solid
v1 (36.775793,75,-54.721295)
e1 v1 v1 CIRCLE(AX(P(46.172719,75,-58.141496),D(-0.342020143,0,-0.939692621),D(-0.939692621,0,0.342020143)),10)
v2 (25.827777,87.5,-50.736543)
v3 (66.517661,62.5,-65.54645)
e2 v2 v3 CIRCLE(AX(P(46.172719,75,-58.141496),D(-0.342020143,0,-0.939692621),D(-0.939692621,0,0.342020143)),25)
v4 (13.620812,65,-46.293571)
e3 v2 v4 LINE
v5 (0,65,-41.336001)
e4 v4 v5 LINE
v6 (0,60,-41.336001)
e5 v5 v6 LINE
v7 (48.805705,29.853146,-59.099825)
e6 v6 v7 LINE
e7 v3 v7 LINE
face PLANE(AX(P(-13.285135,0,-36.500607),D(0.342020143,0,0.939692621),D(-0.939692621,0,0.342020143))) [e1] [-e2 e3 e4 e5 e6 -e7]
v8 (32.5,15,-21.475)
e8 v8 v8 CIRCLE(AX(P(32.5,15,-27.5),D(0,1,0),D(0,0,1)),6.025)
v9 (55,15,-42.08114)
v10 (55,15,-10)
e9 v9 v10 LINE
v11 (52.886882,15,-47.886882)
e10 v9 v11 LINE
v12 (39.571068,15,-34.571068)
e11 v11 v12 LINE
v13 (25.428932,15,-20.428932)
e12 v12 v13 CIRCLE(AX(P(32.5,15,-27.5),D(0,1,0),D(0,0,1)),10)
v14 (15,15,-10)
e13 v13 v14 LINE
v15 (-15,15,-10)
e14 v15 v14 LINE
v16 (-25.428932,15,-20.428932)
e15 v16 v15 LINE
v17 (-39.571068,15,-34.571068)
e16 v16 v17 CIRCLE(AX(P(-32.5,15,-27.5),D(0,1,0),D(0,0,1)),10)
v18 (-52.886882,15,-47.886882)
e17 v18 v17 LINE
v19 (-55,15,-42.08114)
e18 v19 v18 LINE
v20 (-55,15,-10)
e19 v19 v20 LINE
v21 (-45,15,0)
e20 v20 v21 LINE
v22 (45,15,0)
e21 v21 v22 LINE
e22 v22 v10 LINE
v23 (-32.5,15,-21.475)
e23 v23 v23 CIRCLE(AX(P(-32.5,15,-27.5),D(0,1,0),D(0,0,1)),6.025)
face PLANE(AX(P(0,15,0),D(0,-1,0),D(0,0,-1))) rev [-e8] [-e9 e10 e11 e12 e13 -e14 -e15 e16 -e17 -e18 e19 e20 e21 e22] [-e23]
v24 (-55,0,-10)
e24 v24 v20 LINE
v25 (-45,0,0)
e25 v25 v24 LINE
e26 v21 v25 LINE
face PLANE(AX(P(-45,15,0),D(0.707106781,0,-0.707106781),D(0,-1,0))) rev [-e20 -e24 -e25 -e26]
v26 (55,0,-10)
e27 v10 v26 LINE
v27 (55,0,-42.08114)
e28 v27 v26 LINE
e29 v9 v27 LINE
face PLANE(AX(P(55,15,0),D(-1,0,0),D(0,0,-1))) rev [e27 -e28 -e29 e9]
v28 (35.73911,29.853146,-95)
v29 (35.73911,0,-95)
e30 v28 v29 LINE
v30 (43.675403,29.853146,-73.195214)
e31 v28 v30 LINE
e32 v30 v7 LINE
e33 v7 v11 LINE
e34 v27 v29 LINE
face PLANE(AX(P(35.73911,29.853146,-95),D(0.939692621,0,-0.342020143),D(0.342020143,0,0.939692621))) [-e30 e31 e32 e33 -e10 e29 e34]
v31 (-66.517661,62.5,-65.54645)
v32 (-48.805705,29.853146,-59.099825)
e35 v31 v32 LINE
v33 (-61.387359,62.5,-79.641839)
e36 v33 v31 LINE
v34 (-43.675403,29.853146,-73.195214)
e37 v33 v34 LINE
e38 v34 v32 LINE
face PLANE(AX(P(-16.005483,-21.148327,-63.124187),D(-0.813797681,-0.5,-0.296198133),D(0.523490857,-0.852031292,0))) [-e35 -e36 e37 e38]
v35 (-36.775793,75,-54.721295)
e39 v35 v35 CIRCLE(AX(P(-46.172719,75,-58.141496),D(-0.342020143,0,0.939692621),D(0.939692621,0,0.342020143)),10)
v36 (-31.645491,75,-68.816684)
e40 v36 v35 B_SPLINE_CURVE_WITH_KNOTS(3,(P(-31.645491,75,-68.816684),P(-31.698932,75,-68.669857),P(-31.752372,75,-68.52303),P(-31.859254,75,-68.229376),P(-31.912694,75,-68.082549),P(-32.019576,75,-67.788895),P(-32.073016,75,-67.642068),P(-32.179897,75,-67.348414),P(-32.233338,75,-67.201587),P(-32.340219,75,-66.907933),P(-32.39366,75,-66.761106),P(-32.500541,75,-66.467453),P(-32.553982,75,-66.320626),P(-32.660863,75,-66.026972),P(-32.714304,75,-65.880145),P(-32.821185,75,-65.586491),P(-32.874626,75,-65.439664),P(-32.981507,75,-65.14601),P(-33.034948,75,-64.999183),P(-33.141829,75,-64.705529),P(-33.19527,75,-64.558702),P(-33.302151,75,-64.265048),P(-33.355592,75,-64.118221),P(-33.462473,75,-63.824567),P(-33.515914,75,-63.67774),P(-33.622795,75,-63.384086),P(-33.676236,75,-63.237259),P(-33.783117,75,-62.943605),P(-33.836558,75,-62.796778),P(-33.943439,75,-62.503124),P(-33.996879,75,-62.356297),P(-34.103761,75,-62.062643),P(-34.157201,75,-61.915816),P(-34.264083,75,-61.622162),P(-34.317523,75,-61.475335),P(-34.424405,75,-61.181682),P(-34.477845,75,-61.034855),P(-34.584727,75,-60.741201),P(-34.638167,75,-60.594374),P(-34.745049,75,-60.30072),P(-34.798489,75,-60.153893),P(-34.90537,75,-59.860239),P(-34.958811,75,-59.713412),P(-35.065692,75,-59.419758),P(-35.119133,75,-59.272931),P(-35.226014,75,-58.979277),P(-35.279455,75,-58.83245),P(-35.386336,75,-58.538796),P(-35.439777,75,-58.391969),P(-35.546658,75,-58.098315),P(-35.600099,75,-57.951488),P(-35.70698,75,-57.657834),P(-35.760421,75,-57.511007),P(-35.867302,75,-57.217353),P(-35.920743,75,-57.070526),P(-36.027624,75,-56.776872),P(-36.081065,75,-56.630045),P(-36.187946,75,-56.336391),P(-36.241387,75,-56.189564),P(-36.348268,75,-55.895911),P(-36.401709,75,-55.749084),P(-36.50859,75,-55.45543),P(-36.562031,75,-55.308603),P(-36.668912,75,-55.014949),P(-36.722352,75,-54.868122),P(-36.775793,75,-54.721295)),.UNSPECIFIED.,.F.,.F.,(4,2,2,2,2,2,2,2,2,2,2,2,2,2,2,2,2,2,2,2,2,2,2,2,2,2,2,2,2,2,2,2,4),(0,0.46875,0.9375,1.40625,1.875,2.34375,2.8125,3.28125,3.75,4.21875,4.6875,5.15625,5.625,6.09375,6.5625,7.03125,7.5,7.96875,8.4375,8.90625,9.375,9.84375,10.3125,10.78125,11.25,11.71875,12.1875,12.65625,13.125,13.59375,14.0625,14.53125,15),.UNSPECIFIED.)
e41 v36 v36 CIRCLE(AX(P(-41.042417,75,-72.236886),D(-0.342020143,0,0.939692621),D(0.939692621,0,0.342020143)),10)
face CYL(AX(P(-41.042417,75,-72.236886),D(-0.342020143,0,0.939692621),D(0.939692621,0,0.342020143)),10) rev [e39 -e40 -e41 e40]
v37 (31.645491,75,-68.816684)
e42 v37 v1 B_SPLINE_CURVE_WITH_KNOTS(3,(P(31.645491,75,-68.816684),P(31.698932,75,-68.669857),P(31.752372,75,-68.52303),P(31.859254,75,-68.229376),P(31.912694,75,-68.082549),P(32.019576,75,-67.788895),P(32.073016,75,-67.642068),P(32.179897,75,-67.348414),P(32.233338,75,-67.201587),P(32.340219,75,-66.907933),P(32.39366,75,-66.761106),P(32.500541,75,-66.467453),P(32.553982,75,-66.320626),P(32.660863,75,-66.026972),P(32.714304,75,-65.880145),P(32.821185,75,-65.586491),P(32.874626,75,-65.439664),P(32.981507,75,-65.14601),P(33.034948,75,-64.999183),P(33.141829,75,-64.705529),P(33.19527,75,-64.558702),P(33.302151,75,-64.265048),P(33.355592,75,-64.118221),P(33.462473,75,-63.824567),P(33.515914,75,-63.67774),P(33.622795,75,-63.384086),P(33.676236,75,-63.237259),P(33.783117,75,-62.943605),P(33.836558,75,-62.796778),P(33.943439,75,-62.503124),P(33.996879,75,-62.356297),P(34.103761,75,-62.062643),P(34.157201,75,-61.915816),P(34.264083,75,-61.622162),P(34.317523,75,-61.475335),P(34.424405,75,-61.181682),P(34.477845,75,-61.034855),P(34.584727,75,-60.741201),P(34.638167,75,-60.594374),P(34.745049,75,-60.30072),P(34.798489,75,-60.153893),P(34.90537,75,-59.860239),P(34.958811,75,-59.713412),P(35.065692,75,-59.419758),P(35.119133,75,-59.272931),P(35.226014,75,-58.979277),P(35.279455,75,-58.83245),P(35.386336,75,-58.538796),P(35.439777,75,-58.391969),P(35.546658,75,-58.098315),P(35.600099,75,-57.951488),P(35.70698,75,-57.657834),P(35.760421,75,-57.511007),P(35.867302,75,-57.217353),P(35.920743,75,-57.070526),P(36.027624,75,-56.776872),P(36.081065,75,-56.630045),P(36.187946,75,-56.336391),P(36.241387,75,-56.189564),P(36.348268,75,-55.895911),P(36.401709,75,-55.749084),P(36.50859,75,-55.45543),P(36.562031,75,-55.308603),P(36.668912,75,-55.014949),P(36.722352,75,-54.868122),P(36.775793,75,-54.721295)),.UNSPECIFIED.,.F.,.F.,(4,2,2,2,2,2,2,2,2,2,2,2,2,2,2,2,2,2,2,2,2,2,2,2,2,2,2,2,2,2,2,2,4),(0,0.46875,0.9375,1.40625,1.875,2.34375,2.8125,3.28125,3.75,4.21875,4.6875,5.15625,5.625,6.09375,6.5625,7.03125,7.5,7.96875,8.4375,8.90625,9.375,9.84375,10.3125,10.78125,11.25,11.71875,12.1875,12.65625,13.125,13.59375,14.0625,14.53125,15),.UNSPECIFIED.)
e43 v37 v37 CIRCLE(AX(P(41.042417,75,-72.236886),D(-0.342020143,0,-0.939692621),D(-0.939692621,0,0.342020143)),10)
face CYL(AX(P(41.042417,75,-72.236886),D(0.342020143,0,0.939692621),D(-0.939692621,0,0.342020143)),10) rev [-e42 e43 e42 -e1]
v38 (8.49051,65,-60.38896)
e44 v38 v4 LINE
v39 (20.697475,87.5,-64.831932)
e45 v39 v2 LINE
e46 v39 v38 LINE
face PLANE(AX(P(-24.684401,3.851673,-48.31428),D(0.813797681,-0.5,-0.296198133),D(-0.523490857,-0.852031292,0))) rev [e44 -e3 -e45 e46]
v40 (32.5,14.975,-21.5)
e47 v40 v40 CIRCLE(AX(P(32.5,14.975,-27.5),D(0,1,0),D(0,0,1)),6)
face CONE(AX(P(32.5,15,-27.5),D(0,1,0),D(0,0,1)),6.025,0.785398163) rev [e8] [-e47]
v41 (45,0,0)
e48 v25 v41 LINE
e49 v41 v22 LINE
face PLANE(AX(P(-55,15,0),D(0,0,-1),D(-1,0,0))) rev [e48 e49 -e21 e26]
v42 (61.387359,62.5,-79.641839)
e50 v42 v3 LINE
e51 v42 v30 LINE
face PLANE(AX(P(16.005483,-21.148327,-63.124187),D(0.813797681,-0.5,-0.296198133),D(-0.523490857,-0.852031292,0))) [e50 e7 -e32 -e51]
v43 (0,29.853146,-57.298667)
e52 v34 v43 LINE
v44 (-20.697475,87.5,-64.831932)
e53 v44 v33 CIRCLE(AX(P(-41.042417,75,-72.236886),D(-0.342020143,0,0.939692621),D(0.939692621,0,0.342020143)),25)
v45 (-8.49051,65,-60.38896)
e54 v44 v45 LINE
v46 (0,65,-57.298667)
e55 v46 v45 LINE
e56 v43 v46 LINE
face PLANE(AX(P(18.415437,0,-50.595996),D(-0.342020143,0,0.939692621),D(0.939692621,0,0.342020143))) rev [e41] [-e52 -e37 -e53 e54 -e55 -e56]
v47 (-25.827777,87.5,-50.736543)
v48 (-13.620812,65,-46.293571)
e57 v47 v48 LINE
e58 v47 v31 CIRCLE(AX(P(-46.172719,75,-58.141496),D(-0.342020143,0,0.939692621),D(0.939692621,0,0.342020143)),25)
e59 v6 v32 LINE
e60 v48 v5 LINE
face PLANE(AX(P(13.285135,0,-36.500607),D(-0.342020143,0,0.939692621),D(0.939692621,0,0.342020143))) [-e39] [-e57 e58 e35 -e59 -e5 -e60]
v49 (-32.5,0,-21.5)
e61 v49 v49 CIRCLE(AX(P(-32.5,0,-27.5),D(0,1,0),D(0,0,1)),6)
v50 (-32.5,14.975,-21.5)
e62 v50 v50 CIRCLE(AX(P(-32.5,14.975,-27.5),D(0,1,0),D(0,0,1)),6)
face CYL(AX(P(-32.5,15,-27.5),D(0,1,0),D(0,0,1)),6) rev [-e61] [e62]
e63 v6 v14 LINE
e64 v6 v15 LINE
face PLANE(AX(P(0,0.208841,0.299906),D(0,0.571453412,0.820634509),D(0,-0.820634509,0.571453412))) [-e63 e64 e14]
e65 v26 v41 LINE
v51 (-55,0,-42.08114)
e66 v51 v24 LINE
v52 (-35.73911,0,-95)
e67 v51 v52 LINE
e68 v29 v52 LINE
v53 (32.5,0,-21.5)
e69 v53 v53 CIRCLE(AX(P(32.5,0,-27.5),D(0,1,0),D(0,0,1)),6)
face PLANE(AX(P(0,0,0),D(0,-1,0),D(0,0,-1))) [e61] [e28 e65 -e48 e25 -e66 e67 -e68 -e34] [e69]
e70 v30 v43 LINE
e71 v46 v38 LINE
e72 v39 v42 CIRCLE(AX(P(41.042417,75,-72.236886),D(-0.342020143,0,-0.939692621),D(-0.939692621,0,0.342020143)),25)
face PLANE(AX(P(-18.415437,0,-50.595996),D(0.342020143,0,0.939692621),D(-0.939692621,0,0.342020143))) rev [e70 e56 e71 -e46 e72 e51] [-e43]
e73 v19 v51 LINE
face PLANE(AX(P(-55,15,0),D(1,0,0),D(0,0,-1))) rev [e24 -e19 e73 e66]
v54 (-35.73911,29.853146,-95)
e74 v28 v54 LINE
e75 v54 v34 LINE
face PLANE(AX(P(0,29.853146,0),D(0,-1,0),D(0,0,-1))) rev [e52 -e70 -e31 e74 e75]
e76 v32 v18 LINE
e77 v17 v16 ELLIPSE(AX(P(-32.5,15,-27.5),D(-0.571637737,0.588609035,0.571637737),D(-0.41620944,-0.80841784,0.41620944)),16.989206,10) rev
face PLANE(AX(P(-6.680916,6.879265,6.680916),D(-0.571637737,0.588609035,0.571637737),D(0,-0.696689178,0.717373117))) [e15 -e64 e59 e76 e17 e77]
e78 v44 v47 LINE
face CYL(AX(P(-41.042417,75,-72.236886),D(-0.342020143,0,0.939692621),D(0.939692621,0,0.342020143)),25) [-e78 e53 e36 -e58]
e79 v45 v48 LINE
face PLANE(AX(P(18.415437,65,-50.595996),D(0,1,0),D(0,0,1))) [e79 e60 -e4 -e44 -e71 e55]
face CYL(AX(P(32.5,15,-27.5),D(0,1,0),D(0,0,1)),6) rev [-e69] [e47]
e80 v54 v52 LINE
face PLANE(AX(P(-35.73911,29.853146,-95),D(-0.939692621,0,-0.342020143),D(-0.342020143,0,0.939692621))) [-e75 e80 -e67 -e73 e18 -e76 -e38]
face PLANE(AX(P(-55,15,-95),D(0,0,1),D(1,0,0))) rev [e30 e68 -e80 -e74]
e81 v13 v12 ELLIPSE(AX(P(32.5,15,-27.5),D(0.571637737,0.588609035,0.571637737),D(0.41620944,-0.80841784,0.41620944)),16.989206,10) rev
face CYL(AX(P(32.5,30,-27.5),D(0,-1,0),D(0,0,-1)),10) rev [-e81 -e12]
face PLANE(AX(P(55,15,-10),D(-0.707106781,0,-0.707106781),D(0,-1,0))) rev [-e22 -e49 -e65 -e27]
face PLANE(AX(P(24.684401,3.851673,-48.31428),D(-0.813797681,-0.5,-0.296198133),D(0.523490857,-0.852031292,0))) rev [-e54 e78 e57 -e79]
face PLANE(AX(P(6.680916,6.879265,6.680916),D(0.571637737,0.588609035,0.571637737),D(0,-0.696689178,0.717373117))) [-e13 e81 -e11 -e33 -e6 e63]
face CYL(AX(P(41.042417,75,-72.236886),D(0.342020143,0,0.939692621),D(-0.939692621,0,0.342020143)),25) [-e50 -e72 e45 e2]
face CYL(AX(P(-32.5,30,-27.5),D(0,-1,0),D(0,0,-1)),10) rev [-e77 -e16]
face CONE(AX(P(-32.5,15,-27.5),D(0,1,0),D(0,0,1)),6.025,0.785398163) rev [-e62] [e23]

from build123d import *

# Parameters (mm, degrees)
SKETCH1_W                           = 110
SKETCH1_H                           = 95
BOSS_EXTRUDE1_DEPTH                 = 15
SKETCH6_R                           = 25
SKETCH6_R_2                         = 10
BOSS_EXTRUDE7_DEPTH                 = 15
DELETEFACE4_START                   = 15
DELETEFACE4_DEPTH                   = 50
CUT_EXTRUDE1_DEPTH                  = 29.85315
BOSS_EXTRUDE8_DEPTH                 = 14.85315
F_12_0_12_DIAMETER_HOLE1_AT_2_COUNT = 2
F_12_0_12_DIAMETER_HOLE1_AT_2_PITCH = 65
SKETCH17_R                          = 10
CUT_EXTRUDE2_DEPTH                  = 15
CHAMFER1_SIZE                       = 10


# Read off the part's stored shape, not the designer's step: DeleteFace4
with BuildPart() as part:
    # Sketch1 → Boss-Extrude1 (new body)
    with BuildSketch(Plane(origin=(0, 0, 0), x_dir=(1, 0, 0), z_dir=(0, 1, 0))):
        with Locations((0, 47.5)):
            Rectangle(SKETCH1_W, SKETCH1_H)
    extrude(amount=BOSS_EXTRUDE1_DEPTH)

    # Sketch6 → Boss-Extrude7 (add)
    # profile 1 of 3: a face of its own
    with BuildSketch(Plane(origin=(-46.172719349, 75, -58.141496194), x_dir=(0.9396926207859081, 0, 0.34202014332566977), z_dir=(-0.3420201433256697, 0, 0.939692620785908))):
        Circle(SKETCH6_R)
        Circle(SKETCH6_R_2, mode=Mode.SUBTRACT)
    # profile 2 of 3: a face of its own
    with BuildSketch(Plane(origin=(-46.172719349, 75, -58.141496194), x_dir=(0.9396926207859081, 0, 0.34202014332566977), z_dir=(-0.3420201433256697, 0, 0.939692620785908))):
        with BuildLine():
            ThreePointArc((25, 0), (6.470476128, -24.148145657), (-21.650635095, -12.5))
            Line((-21.650635095, -12.5), (5.773502692, -60))
            Line((5.773502692, -60), (63.508529611, -60))
            Line((63.508529611, -60), (34.641016151, -10))
            Line((34.641016151, -10), (21.650635095, 12.5))
            ThreePointArc((21.650635095, 12.5), (24.148145657, 6.470476128), (25, 0))
        make_face()
    # profile 3 of 3: a face of its own
    with BuildSketch(Plane(origin=(-46.172719349, 75, -58.141496194), x_dir=(0.9396926207859081, 0, 0.34202014332566977), z_dir=(-0.3420201433256697, 0, 0.939692620785908))):
        Polygon((34.641016151, -10), (63.508529611, -60), (84.985310553, -60), (84.985310553, -10), align=None)
    boss_extrude7 = extrude(amount=-BOSS_EXTRUDE7_DEPTH)

    # Mirror1: Boss-Extrude7 across plane
    add(boss_extrude7.mirror(Plane(origin=(0, 0, 0), x_dir=(0, 0, 1), z_dir=(1, 0, 0))))

    # DeleteFace4 outline → DeleteFace4 (cut)
    with BuildSketch(Plane(origin=(0, 0, 0), x_dir=(1, 0, 0), z_dir=(0, 1, 0)).offset(DELETEFACE4_START)):
        Polygon((21.928533001, 49.317334009), (0, 41.336000716), (33.687349853, 29.074808098), (38.817652003, 43.17019741), align=None)
        Polygon((0, 41.336000716), (-21.928533001, 49.317334009), (-38.817652003, 43.17019741), (-33.687349853, 29.074808098), align=None)
    extrude(amount=DELETEFACE4_DEPTH, mode=Mode.SUBTRACT)

    # Sketch8 → Loft1 section 0
    with BuildSketch(Plane(origin=(0, 15, 0), x_dir=(1, 0, 0), z_dir=(0, 1, 0)), mode=Mode.PRIVATE) as loft1_s0:
        with BuildLine():
            Line((-15, 10), (15, 10))
            Line((15, 10), (72.85193746, 67.85193746))
            Line((72.85193746, 67.85193746), (0, 41.336000716))
            Line((0, 41.336000716), (-72.85193746, 67.85193746))
            Line((-72.85193746, 67.85193746), (-15, 10))
        make_face()
    loft([Vertex(0, 60, -41.336000716), loft1_s0.sketch])

    # Sketch13 → Cut-Extrude1 (cut)
    with BuildSketch(Plane(origin=(0, 0, 0), x_dir=(1, 0, 0), z_dir=(0, 1, 0))):
        Polygon((-55, 95), (-55, 42.081139662), (-35.739110006, 95), align=None)
    extrude(amount=CUT_EXTRUDE1_DEPTH, mode=Mode.SUBTRACT)


with BuildPart() as cut_extrude1_kept_piece:
    # of the separate pieces the step leaves, the one the design keeps (cut_extrude1_pieces_kept)
    add(part.part.solids().sort_by_distance((-55, 0, 0))[0])

    # Sketch14 → Boss-Extrude8 (add)
    with BuildSketch(Plane(origin=(0, 15, 0), x_dir=(1, 0, 0), z_dir=(0, 1, 0))):
        Polygon((0, 57.298667303), (0, 95), (-35.739110006, 95), (-48.805705227, 59.099824681), (-40.747401473, 56.166841976), (-35.617099323, 70.262231288), align=None)
    extrude(amount=BOSS_EXTRUDE8_DEPTH)

    # SurfaceCut2
    split(bisect_by=Plane(origin=(0, 0, 0), x_dir=(0, 0, -1), z_dir=(1, 0, 0)), keep=Keep.BOTTOM)

    # Mirror3: Cut-Extrude1 kept piece across plane


with BuildPart() as cut_extrude1_kept_piece_1:
    add(cut_extrude1_kept_piece.part)
    add(cut_extrude1_kept_piece.part.mirror(Plane(origin=(0, 0, 0), x_dir=(0, 0, 1), z_dir=(1, 0, 0))))

    # Sketch16 → Ø12.0 (12) Diameter Hole1 (revolve, cut)
    with BuildSketch(Plane(origin=(32.5, 15, -27.5), x_dir=(0, 0, 1), z_dir=(1, 0, 0))):
        Polygon((0, 0), (0, 15), (6, 15), (6, 0.025), (6.025, 0), align=None)
    f_12_0_12_diameter_hole1 = revolve(axis=Axis((32.5, 21.35, -27.5), (0, -1, 0)), mode=Mode.SUBTRACT)

    # Ø12.0 (12) Diameter Hole1 at 2: Ø12.0 (12) Diameter Hole1 ×2
    with Locations(*[(-i * F_12_0_12_DIAMETER_HOLE1_AT_2_PITCH, 0, 0) for i in range(1, F_12_0_12_DIAMETER_HOLE1_AT_2_COUNT)]):
        add(f_12_0_12_diameter_hole1, mode=Mode.SUBTRACT)

    # Sketch17 → Cut-Extrude2 (cut)
    with BuildSketch(Plane(origin=(0, 15, 0), x_dir=(1, 0, 0), z_dir=(0, 1, 0))):
        with Locations((-32.5, 27.5)):
            Circle(SKETCH17_R)
        with Locations((32.5, 27.5)):
            Circle(SKETCH17_R)
    extrude(amount=CUT_EXTRUDE2_DEPTH, mode=Mode.SUBTRACT)

    # Chamfer1
    chamfer1_edges = [cut_extrude1_kept_piece_1.edges().sort_by_distance(p)[0] for p in [
        (-55, 7.5, 0),
        (55, 7.5, 0),
    ]]
    chamfer(chamfer1_edges, length=CHAMFER1_SIZE)


solid = cut_extrude1_kept_piece_1.part
